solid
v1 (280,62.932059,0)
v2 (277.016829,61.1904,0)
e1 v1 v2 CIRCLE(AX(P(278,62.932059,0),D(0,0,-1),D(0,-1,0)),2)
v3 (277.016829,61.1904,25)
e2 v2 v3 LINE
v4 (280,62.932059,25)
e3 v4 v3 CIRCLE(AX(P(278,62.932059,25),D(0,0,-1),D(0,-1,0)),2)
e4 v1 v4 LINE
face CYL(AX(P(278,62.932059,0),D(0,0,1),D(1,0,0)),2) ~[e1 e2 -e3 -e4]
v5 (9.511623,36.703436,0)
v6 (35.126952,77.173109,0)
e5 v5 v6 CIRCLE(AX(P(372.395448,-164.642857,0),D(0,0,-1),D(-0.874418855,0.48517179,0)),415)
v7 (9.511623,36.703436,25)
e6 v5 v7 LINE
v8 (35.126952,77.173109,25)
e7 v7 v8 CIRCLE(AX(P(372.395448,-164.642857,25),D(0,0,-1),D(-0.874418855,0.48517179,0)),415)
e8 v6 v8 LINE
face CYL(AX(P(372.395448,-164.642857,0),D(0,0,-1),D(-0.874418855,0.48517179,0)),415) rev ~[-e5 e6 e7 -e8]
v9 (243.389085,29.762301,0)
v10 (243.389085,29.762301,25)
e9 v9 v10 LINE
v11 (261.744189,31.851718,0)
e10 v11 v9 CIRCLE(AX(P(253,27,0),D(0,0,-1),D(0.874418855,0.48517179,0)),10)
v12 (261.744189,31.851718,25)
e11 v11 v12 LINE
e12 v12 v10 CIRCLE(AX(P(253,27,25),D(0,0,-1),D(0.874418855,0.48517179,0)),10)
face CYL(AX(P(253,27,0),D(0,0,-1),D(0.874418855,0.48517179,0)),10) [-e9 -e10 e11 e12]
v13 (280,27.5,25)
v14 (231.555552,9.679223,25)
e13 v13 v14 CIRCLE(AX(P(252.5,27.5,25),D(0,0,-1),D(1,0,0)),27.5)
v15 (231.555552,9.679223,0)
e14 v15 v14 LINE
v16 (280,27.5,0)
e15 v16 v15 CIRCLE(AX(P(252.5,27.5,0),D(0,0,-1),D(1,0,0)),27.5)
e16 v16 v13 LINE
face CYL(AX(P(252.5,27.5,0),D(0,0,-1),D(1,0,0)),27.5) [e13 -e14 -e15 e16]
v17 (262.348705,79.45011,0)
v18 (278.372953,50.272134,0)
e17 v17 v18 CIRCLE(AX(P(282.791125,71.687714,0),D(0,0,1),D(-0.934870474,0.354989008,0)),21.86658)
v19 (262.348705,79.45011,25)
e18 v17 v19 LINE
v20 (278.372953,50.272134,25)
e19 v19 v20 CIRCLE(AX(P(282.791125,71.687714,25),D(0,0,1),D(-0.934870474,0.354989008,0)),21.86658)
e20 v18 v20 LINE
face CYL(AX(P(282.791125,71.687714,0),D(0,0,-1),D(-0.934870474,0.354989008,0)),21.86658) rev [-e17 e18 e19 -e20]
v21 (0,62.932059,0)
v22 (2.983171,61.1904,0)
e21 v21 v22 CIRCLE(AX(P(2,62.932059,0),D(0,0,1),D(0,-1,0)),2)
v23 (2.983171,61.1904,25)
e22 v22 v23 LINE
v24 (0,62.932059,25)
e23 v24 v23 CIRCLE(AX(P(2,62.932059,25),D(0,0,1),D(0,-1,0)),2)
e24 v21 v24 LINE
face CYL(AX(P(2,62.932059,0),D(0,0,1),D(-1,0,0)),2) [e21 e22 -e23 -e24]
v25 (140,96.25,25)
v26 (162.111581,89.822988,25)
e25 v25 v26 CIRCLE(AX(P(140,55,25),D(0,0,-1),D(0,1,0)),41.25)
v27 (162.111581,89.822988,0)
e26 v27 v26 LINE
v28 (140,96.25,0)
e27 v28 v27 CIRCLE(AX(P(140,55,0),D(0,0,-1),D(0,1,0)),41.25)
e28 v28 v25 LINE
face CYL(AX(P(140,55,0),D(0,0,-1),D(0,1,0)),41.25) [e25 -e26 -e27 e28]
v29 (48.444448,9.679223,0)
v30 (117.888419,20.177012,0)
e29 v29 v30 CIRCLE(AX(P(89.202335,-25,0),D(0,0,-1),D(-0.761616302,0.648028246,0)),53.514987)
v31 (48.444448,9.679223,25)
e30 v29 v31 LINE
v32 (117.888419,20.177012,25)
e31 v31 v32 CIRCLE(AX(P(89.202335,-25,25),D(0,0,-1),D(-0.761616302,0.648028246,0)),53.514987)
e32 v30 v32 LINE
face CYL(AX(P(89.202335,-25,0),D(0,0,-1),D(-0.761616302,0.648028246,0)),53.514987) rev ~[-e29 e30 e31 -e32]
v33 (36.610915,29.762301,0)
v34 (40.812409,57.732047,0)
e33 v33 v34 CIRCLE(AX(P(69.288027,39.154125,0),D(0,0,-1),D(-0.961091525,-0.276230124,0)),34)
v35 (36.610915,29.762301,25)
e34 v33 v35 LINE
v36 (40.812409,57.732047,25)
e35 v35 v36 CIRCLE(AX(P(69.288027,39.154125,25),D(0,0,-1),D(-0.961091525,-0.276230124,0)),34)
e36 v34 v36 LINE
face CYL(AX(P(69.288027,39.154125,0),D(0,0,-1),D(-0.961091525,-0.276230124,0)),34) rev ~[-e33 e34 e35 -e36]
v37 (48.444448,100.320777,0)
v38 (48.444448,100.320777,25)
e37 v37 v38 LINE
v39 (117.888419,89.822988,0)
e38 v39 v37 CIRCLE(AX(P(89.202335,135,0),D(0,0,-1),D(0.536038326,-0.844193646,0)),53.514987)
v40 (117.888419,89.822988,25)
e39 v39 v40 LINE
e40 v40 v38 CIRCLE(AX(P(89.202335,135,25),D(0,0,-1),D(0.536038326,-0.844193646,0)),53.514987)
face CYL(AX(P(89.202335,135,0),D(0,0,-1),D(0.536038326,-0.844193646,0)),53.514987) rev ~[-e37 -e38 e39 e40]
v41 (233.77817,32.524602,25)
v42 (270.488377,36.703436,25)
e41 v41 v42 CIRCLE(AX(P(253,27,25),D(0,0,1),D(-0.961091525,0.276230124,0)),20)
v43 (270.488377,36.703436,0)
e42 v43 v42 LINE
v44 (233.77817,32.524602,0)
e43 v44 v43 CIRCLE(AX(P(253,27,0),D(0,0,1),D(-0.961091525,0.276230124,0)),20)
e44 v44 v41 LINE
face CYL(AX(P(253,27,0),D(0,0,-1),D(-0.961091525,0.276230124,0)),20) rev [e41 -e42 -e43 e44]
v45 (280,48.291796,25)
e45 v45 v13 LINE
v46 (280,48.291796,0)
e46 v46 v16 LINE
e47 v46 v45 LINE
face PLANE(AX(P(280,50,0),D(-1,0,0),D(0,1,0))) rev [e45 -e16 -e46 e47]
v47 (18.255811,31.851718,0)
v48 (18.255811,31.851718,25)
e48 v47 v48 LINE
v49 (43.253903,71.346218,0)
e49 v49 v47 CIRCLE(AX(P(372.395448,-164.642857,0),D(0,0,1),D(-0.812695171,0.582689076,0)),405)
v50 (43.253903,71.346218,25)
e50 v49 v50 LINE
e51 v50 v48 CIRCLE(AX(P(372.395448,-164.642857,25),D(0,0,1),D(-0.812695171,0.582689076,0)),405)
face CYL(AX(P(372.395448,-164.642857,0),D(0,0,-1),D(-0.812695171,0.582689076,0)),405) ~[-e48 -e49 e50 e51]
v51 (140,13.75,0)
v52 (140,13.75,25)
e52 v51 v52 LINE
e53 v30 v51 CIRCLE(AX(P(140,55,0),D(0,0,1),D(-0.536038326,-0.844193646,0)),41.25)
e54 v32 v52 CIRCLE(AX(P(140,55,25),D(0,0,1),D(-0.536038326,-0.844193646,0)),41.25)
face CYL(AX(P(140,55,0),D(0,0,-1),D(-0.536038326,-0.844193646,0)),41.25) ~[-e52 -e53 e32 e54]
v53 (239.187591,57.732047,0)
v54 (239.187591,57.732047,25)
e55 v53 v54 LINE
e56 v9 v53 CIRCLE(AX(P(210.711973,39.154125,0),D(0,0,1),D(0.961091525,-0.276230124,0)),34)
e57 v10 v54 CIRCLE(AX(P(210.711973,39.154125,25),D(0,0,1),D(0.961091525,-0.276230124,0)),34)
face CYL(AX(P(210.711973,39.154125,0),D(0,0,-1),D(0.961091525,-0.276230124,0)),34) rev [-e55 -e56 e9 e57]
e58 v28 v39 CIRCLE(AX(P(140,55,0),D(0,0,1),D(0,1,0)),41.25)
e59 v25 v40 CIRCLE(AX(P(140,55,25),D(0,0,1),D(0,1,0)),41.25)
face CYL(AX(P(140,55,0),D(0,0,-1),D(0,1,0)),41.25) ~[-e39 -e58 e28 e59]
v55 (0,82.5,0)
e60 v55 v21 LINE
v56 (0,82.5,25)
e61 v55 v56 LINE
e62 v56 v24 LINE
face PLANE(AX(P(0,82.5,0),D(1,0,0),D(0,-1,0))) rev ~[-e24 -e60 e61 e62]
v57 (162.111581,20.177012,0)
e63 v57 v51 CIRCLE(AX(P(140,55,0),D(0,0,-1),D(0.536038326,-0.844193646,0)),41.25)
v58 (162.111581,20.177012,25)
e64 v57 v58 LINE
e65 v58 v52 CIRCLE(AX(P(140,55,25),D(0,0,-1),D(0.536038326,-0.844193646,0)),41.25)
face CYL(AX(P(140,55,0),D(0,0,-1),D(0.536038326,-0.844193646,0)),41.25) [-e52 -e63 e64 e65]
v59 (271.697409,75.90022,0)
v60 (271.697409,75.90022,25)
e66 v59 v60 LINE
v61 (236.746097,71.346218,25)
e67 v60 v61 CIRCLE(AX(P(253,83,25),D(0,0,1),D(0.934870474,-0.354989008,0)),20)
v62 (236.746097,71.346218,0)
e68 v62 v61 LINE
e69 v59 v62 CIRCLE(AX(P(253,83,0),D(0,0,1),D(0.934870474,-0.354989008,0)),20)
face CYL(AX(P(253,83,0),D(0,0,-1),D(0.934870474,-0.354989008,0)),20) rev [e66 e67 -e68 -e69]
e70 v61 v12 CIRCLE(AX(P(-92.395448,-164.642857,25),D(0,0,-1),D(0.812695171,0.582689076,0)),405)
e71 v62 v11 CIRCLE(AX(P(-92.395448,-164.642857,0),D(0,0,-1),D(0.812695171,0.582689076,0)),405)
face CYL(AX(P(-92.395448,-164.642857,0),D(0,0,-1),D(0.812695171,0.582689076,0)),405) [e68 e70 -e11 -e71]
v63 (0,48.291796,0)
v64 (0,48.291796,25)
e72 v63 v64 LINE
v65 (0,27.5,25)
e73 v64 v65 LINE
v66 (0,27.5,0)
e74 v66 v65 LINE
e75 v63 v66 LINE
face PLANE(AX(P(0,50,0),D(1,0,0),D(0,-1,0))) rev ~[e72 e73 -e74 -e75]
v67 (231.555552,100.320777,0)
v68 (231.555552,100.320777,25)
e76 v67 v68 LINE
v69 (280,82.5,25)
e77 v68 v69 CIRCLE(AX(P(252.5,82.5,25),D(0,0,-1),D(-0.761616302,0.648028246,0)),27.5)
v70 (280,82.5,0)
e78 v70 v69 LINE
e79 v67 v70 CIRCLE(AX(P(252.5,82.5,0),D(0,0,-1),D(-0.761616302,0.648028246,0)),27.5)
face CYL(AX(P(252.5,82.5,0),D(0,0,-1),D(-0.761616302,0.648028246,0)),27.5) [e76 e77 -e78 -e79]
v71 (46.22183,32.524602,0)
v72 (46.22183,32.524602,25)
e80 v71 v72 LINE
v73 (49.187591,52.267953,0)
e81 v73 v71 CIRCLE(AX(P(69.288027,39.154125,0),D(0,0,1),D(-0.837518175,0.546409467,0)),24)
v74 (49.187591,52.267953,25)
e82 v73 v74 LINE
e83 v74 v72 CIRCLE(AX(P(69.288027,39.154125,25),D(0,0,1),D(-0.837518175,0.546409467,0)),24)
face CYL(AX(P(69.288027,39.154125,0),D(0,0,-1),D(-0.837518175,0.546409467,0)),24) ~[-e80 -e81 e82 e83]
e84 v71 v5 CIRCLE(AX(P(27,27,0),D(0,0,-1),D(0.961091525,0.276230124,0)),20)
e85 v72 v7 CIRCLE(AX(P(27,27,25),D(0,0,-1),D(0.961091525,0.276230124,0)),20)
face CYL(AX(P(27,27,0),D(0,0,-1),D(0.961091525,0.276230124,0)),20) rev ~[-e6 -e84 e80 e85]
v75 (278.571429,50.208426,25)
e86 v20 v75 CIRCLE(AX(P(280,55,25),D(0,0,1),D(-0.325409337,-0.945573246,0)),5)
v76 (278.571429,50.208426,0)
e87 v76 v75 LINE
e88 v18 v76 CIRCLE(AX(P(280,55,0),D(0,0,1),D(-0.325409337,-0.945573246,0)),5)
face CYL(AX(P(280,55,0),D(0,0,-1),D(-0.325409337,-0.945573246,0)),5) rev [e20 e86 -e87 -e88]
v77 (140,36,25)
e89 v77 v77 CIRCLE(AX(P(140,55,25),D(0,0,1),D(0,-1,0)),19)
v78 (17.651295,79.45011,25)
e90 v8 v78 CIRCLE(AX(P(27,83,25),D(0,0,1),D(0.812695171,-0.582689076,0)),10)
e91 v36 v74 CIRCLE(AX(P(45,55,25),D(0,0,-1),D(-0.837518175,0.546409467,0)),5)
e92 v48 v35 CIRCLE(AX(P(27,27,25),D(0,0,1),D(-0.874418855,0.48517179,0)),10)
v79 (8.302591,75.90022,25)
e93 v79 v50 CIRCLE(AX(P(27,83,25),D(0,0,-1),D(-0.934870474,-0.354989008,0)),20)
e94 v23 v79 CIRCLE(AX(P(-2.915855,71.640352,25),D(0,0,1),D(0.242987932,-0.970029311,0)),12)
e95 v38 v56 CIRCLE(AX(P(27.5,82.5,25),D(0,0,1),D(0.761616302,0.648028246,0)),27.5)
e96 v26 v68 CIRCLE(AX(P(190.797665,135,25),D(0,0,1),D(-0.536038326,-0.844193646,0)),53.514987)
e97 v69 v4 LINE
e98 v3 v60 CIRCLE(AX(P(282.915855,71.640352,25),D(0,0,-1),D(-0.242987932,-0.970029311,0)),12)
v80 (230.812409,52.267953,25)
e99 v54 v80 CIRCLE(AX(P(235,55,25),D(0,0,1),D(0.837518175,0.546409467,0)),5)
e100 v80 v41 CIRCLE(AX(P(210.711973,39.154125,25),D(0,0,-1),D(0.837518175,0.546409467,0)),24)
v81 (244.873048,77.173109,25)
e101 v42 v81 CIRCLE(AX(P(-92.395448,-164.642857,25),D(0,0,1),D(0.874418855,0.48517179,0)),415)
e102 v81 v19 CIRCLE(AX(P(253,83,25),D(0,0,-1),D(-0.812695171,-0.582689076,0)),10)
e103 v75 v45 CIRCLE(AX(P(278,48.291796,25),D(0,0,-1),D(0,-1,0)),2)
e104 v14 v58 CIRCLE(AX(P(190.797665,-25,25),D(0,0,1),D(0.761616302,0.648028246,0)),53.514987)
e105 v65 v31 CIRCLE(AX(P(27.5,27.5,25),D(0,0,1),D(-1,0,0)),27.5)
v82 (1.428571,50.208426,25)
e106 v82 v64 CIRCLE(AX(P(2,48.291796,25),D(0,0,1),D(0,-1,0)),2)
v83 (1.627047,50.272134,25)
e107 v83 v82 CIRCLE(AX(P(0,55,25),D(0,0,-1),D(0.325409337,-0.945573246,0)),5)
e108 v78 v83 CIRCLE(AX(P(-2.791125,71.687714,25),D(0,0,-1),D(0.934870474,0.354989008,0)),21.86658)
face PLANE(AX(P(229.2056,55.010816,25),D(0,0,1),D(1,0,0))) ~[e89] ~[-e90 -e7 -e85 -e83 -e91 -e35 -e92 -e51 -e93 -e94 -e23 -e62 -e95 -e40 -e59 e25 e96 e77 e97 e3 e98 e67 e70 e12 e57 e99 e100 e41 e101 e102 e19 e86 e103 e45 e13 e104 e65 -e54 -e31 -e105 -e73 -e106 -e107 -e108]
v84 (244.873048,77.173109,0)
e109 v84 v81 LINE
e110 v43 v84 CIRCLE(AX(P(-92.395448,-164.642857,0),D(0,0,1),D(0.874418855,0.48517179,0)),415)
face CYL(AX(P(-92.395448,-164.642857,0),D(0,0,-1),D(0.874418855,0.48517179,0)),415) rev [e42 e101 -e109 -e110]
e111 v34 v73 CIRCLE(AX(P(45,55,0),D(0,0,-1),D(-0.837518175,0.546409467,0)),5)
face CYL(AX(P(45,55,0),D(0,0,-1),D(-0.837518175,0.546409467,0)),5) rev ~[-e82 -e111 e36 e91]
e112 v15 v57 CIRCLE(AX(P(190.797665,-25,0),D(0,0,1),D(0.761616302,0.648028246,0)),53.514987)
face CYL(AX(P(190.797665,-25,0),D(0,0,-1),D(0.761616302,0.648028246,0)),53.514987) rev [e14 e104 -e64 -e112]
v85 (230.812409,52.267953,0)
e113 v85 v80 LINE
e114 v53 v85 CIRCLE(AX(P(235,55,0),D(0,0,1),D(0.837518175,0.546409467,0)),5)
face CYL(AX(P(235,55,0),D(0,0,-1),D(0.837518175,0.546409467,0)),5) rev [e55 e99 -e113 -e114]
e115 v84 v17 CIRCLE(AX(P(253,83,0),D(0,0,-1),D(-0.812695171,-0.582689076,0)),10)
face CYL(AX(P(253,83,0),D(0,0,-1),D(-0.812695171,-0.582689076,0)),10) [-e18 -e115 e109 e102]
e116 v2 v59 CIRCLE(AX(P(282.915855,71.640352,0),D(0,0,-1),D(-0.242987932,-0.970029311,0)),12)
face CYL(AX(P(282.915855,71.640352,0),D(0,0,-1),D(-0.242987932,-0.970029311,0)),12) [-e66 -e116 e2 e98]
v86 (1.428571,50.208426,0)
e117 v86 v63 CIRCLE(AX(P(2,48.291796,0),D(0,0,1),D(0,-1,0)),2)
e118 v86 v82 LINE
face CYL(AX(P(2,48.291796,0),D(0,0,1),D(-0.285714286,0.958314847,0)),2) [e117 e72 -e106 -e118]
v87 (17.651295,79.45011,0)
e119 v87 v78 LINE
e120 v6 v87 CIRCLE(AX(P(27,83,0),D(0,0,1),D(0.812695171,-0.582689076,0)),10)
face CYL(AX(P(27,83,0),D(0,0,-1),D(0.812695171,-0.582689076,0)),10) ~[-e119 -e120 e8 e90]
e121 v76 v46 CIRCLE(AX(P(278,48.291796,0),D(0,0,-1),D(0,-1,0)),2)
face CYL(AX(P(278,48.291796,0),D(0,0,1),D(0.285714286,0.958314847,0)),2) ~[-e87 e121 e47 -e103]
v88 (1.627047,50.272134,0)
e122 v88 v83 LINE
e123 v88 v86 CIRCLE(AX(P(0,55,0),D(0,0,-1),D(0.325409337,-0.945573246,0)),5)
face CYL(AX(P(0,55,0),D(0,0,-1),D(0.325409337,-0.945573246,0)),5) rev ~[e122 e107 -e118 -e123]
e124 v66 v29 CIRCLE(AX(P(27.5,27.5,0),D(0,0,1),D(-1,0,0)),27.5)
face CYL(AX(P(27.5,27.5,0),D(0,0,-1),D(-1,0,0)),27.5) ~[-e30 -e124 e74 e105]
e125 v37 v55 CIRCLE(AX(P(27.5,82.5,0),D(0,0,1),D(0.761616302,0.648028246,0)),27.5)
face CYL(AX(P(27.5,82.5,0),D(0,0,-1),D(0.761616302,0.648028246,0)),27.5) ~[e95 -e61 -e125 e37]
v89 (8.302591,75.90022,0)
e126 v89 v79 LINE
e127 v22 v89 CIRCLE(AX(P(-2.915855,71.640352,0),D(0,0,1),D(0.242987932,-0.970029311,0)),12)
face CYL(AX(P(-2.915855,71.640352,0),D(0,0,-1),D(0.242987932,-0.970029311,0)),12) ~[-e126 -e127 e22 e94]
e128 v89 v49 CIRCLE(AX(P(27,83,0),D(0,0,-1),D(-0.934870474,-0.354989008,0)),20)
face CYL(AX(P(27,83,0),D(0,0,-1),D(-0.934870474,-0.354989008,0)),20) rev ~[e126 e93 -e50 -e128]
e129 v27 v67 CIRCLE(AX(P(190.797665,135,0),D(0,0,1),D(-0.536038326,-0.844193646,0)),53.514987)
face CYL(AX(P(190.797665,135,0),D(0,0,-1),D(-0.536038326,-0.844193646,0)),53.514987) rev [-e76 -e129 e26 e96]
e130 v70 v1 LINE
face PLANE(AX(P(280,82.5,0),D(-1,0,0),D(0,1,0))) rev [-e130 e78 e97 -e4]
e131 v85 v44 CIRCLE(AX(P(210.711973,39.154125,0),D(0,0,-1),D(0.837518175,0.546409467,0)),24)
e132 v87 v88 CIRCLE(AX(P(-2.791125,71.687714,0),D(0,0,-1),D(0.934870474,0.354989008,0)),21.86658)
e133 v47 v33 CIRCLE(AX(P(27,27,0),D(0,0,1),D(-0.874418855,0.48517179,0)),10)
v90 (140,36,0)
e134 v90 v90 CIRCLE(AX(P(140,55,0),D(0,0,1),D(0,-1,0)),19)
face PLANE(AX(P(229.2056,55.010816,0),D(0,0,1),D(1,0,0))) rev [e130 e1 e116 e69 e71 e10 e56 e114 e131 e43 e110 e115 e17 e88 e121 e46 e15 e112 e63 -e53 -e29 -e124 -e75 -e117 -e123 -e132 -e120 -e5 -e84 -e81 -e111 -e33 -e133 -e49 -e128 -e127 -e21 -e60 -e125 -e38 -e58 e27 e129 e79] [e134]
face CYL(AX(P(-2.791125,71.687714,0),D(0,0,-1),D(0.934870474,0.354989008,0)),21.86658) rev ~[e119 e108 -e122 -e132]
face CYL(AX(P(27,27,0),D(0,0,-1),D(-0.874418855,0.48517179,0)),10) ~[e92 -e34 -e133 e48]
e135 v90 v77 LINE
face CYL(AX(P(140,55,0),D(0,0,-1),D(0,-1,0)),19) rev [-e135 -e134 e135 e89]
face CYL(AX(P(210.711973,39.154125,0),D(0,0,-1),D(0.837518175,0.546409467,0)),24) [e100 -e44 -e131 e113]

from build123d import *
from build123d import SkipClean  # not in build123d's __all__

# Parameters (mm, degrees)
F1_DEPTH = 25
F3_R     = 2


with BuildPart() as f1:
    # F0 (on Top) → F1 (new body)
    with BuildSketch(Plane.XY):
        with BuildLine():
            ThreePointArc((140, 36), (121, 55), (140, 74))
            Line((140, 74), (140, 96.25))
            ThreePointArc((140, 96.25), (128.4866545127, 94.6106724973), (117.8884190329, 89.8229879123))
            ThreePointArc((117.8884190329, 89.8229879123), (81.203397703, 82.0861941742), (48.4444483171, 100.3207767702))
            ThreePointArc((48.4444483171, 100.3207767702), (18.0058525586, 108.309129477), (0, 82.5))
            Line((0, 82.5), (0, 60))
            ThreePointArc((0, 60), (7.7212902527, 66.0859717551), (8.3025905106, 75.9002198354))
            ThreePointArc((8.3025905106, 75.9002198354), (29.5840689899, 102.832362125), (43.2539034221, 71.3462184874))
            ThreePointArc((43.2539034221, 71.3462184874), (30.1846255305, 51.9598971701), (18.2558114501, 31.8517179024))
            ThreePointArc((18.2558114501, 31.8517179024), (25.8689742306, 17.0641668337), (36.6109152463, 29.7623012378))
            ThreePointArc((36.6109152463, 29.7623012378), (35.6652555644, 44.2047922692), (40.8124091235, 57.7320473369))
            ThreePointArc((40.8124091235, 57.7320473369), (47.7320473369, 59.1875908765), (49.1875908765, 52.2679526631))
            ThreePointArc((49.1875908765, 52.2679526631), (45.5543060113, 42.7193020271), (46.2218304926, 32.5246024755))
            ThreePointArc((46.2218304926, 32.5246024755), (24.7379484611, 7.1283336674), (9.5116229002, 36.7034358047))
            ThreePointArc((9.5116229002, 36.7034358047), (21.7349755999, 57.308113326), (35.1269517111, 77.1731092437))
            ThreePointArc((35.1269517111, 77.1731092437), (28.2920344949, 92.9161810625), (17.6512952553, 79.4501099177))
            ThreePointArc((17.6512952553, 79.4501099177), (16.3752735006, 61.1617226531), (1.6270466845, 50.2721337703))
            ThreePointArc((1.6270466845, 50.2721337703), (0.8248238755, 50.0685027046), (0, 50))
            Line((0, 50), (0, 27.5))
            ThreePointArc((0, 27.5), (18.0058525586, 1.690870523), (48.4444483171, 9.6792232298))
            ThreePointArc((48.4444483171, 9.6792232298), (81.203397703, 27.9138058258), (117.8884190329, 20.1770120877))
            ThreePointArc((117.8884190329, 20.1770120877), (128.4866545127, 15.3893275027), (140, 13.75))
            Line((140, 13.75), (140, 36))
        make_face()
    extrude(amount=F1_DEPTH)

    # F2: F1 across face


with BuildPart() as f1_1:
    add(f1.part, clean=False)
    with SkipClean():  # cleaning this boolean's faces spoils the solid; the shape is the same uncleaned
        add(f1.part.mirror(Plane(origin=(140, 85.125, 12.5), x_dir=(0, 1, 0), z_dir=(1, 0, 0))), clean=False)

    # F3
    f3_edges = [f1_1.edges().sort_by_distance(p)[0] for p in [
        (0, 60, 12.5),
        (0, 50, 12.5),
        (280, 60, 12.5),
        (280, 50, 12.5),
    ]]
    fillet(f3_edges, radius=F3_R)


solid = f1_1.part
